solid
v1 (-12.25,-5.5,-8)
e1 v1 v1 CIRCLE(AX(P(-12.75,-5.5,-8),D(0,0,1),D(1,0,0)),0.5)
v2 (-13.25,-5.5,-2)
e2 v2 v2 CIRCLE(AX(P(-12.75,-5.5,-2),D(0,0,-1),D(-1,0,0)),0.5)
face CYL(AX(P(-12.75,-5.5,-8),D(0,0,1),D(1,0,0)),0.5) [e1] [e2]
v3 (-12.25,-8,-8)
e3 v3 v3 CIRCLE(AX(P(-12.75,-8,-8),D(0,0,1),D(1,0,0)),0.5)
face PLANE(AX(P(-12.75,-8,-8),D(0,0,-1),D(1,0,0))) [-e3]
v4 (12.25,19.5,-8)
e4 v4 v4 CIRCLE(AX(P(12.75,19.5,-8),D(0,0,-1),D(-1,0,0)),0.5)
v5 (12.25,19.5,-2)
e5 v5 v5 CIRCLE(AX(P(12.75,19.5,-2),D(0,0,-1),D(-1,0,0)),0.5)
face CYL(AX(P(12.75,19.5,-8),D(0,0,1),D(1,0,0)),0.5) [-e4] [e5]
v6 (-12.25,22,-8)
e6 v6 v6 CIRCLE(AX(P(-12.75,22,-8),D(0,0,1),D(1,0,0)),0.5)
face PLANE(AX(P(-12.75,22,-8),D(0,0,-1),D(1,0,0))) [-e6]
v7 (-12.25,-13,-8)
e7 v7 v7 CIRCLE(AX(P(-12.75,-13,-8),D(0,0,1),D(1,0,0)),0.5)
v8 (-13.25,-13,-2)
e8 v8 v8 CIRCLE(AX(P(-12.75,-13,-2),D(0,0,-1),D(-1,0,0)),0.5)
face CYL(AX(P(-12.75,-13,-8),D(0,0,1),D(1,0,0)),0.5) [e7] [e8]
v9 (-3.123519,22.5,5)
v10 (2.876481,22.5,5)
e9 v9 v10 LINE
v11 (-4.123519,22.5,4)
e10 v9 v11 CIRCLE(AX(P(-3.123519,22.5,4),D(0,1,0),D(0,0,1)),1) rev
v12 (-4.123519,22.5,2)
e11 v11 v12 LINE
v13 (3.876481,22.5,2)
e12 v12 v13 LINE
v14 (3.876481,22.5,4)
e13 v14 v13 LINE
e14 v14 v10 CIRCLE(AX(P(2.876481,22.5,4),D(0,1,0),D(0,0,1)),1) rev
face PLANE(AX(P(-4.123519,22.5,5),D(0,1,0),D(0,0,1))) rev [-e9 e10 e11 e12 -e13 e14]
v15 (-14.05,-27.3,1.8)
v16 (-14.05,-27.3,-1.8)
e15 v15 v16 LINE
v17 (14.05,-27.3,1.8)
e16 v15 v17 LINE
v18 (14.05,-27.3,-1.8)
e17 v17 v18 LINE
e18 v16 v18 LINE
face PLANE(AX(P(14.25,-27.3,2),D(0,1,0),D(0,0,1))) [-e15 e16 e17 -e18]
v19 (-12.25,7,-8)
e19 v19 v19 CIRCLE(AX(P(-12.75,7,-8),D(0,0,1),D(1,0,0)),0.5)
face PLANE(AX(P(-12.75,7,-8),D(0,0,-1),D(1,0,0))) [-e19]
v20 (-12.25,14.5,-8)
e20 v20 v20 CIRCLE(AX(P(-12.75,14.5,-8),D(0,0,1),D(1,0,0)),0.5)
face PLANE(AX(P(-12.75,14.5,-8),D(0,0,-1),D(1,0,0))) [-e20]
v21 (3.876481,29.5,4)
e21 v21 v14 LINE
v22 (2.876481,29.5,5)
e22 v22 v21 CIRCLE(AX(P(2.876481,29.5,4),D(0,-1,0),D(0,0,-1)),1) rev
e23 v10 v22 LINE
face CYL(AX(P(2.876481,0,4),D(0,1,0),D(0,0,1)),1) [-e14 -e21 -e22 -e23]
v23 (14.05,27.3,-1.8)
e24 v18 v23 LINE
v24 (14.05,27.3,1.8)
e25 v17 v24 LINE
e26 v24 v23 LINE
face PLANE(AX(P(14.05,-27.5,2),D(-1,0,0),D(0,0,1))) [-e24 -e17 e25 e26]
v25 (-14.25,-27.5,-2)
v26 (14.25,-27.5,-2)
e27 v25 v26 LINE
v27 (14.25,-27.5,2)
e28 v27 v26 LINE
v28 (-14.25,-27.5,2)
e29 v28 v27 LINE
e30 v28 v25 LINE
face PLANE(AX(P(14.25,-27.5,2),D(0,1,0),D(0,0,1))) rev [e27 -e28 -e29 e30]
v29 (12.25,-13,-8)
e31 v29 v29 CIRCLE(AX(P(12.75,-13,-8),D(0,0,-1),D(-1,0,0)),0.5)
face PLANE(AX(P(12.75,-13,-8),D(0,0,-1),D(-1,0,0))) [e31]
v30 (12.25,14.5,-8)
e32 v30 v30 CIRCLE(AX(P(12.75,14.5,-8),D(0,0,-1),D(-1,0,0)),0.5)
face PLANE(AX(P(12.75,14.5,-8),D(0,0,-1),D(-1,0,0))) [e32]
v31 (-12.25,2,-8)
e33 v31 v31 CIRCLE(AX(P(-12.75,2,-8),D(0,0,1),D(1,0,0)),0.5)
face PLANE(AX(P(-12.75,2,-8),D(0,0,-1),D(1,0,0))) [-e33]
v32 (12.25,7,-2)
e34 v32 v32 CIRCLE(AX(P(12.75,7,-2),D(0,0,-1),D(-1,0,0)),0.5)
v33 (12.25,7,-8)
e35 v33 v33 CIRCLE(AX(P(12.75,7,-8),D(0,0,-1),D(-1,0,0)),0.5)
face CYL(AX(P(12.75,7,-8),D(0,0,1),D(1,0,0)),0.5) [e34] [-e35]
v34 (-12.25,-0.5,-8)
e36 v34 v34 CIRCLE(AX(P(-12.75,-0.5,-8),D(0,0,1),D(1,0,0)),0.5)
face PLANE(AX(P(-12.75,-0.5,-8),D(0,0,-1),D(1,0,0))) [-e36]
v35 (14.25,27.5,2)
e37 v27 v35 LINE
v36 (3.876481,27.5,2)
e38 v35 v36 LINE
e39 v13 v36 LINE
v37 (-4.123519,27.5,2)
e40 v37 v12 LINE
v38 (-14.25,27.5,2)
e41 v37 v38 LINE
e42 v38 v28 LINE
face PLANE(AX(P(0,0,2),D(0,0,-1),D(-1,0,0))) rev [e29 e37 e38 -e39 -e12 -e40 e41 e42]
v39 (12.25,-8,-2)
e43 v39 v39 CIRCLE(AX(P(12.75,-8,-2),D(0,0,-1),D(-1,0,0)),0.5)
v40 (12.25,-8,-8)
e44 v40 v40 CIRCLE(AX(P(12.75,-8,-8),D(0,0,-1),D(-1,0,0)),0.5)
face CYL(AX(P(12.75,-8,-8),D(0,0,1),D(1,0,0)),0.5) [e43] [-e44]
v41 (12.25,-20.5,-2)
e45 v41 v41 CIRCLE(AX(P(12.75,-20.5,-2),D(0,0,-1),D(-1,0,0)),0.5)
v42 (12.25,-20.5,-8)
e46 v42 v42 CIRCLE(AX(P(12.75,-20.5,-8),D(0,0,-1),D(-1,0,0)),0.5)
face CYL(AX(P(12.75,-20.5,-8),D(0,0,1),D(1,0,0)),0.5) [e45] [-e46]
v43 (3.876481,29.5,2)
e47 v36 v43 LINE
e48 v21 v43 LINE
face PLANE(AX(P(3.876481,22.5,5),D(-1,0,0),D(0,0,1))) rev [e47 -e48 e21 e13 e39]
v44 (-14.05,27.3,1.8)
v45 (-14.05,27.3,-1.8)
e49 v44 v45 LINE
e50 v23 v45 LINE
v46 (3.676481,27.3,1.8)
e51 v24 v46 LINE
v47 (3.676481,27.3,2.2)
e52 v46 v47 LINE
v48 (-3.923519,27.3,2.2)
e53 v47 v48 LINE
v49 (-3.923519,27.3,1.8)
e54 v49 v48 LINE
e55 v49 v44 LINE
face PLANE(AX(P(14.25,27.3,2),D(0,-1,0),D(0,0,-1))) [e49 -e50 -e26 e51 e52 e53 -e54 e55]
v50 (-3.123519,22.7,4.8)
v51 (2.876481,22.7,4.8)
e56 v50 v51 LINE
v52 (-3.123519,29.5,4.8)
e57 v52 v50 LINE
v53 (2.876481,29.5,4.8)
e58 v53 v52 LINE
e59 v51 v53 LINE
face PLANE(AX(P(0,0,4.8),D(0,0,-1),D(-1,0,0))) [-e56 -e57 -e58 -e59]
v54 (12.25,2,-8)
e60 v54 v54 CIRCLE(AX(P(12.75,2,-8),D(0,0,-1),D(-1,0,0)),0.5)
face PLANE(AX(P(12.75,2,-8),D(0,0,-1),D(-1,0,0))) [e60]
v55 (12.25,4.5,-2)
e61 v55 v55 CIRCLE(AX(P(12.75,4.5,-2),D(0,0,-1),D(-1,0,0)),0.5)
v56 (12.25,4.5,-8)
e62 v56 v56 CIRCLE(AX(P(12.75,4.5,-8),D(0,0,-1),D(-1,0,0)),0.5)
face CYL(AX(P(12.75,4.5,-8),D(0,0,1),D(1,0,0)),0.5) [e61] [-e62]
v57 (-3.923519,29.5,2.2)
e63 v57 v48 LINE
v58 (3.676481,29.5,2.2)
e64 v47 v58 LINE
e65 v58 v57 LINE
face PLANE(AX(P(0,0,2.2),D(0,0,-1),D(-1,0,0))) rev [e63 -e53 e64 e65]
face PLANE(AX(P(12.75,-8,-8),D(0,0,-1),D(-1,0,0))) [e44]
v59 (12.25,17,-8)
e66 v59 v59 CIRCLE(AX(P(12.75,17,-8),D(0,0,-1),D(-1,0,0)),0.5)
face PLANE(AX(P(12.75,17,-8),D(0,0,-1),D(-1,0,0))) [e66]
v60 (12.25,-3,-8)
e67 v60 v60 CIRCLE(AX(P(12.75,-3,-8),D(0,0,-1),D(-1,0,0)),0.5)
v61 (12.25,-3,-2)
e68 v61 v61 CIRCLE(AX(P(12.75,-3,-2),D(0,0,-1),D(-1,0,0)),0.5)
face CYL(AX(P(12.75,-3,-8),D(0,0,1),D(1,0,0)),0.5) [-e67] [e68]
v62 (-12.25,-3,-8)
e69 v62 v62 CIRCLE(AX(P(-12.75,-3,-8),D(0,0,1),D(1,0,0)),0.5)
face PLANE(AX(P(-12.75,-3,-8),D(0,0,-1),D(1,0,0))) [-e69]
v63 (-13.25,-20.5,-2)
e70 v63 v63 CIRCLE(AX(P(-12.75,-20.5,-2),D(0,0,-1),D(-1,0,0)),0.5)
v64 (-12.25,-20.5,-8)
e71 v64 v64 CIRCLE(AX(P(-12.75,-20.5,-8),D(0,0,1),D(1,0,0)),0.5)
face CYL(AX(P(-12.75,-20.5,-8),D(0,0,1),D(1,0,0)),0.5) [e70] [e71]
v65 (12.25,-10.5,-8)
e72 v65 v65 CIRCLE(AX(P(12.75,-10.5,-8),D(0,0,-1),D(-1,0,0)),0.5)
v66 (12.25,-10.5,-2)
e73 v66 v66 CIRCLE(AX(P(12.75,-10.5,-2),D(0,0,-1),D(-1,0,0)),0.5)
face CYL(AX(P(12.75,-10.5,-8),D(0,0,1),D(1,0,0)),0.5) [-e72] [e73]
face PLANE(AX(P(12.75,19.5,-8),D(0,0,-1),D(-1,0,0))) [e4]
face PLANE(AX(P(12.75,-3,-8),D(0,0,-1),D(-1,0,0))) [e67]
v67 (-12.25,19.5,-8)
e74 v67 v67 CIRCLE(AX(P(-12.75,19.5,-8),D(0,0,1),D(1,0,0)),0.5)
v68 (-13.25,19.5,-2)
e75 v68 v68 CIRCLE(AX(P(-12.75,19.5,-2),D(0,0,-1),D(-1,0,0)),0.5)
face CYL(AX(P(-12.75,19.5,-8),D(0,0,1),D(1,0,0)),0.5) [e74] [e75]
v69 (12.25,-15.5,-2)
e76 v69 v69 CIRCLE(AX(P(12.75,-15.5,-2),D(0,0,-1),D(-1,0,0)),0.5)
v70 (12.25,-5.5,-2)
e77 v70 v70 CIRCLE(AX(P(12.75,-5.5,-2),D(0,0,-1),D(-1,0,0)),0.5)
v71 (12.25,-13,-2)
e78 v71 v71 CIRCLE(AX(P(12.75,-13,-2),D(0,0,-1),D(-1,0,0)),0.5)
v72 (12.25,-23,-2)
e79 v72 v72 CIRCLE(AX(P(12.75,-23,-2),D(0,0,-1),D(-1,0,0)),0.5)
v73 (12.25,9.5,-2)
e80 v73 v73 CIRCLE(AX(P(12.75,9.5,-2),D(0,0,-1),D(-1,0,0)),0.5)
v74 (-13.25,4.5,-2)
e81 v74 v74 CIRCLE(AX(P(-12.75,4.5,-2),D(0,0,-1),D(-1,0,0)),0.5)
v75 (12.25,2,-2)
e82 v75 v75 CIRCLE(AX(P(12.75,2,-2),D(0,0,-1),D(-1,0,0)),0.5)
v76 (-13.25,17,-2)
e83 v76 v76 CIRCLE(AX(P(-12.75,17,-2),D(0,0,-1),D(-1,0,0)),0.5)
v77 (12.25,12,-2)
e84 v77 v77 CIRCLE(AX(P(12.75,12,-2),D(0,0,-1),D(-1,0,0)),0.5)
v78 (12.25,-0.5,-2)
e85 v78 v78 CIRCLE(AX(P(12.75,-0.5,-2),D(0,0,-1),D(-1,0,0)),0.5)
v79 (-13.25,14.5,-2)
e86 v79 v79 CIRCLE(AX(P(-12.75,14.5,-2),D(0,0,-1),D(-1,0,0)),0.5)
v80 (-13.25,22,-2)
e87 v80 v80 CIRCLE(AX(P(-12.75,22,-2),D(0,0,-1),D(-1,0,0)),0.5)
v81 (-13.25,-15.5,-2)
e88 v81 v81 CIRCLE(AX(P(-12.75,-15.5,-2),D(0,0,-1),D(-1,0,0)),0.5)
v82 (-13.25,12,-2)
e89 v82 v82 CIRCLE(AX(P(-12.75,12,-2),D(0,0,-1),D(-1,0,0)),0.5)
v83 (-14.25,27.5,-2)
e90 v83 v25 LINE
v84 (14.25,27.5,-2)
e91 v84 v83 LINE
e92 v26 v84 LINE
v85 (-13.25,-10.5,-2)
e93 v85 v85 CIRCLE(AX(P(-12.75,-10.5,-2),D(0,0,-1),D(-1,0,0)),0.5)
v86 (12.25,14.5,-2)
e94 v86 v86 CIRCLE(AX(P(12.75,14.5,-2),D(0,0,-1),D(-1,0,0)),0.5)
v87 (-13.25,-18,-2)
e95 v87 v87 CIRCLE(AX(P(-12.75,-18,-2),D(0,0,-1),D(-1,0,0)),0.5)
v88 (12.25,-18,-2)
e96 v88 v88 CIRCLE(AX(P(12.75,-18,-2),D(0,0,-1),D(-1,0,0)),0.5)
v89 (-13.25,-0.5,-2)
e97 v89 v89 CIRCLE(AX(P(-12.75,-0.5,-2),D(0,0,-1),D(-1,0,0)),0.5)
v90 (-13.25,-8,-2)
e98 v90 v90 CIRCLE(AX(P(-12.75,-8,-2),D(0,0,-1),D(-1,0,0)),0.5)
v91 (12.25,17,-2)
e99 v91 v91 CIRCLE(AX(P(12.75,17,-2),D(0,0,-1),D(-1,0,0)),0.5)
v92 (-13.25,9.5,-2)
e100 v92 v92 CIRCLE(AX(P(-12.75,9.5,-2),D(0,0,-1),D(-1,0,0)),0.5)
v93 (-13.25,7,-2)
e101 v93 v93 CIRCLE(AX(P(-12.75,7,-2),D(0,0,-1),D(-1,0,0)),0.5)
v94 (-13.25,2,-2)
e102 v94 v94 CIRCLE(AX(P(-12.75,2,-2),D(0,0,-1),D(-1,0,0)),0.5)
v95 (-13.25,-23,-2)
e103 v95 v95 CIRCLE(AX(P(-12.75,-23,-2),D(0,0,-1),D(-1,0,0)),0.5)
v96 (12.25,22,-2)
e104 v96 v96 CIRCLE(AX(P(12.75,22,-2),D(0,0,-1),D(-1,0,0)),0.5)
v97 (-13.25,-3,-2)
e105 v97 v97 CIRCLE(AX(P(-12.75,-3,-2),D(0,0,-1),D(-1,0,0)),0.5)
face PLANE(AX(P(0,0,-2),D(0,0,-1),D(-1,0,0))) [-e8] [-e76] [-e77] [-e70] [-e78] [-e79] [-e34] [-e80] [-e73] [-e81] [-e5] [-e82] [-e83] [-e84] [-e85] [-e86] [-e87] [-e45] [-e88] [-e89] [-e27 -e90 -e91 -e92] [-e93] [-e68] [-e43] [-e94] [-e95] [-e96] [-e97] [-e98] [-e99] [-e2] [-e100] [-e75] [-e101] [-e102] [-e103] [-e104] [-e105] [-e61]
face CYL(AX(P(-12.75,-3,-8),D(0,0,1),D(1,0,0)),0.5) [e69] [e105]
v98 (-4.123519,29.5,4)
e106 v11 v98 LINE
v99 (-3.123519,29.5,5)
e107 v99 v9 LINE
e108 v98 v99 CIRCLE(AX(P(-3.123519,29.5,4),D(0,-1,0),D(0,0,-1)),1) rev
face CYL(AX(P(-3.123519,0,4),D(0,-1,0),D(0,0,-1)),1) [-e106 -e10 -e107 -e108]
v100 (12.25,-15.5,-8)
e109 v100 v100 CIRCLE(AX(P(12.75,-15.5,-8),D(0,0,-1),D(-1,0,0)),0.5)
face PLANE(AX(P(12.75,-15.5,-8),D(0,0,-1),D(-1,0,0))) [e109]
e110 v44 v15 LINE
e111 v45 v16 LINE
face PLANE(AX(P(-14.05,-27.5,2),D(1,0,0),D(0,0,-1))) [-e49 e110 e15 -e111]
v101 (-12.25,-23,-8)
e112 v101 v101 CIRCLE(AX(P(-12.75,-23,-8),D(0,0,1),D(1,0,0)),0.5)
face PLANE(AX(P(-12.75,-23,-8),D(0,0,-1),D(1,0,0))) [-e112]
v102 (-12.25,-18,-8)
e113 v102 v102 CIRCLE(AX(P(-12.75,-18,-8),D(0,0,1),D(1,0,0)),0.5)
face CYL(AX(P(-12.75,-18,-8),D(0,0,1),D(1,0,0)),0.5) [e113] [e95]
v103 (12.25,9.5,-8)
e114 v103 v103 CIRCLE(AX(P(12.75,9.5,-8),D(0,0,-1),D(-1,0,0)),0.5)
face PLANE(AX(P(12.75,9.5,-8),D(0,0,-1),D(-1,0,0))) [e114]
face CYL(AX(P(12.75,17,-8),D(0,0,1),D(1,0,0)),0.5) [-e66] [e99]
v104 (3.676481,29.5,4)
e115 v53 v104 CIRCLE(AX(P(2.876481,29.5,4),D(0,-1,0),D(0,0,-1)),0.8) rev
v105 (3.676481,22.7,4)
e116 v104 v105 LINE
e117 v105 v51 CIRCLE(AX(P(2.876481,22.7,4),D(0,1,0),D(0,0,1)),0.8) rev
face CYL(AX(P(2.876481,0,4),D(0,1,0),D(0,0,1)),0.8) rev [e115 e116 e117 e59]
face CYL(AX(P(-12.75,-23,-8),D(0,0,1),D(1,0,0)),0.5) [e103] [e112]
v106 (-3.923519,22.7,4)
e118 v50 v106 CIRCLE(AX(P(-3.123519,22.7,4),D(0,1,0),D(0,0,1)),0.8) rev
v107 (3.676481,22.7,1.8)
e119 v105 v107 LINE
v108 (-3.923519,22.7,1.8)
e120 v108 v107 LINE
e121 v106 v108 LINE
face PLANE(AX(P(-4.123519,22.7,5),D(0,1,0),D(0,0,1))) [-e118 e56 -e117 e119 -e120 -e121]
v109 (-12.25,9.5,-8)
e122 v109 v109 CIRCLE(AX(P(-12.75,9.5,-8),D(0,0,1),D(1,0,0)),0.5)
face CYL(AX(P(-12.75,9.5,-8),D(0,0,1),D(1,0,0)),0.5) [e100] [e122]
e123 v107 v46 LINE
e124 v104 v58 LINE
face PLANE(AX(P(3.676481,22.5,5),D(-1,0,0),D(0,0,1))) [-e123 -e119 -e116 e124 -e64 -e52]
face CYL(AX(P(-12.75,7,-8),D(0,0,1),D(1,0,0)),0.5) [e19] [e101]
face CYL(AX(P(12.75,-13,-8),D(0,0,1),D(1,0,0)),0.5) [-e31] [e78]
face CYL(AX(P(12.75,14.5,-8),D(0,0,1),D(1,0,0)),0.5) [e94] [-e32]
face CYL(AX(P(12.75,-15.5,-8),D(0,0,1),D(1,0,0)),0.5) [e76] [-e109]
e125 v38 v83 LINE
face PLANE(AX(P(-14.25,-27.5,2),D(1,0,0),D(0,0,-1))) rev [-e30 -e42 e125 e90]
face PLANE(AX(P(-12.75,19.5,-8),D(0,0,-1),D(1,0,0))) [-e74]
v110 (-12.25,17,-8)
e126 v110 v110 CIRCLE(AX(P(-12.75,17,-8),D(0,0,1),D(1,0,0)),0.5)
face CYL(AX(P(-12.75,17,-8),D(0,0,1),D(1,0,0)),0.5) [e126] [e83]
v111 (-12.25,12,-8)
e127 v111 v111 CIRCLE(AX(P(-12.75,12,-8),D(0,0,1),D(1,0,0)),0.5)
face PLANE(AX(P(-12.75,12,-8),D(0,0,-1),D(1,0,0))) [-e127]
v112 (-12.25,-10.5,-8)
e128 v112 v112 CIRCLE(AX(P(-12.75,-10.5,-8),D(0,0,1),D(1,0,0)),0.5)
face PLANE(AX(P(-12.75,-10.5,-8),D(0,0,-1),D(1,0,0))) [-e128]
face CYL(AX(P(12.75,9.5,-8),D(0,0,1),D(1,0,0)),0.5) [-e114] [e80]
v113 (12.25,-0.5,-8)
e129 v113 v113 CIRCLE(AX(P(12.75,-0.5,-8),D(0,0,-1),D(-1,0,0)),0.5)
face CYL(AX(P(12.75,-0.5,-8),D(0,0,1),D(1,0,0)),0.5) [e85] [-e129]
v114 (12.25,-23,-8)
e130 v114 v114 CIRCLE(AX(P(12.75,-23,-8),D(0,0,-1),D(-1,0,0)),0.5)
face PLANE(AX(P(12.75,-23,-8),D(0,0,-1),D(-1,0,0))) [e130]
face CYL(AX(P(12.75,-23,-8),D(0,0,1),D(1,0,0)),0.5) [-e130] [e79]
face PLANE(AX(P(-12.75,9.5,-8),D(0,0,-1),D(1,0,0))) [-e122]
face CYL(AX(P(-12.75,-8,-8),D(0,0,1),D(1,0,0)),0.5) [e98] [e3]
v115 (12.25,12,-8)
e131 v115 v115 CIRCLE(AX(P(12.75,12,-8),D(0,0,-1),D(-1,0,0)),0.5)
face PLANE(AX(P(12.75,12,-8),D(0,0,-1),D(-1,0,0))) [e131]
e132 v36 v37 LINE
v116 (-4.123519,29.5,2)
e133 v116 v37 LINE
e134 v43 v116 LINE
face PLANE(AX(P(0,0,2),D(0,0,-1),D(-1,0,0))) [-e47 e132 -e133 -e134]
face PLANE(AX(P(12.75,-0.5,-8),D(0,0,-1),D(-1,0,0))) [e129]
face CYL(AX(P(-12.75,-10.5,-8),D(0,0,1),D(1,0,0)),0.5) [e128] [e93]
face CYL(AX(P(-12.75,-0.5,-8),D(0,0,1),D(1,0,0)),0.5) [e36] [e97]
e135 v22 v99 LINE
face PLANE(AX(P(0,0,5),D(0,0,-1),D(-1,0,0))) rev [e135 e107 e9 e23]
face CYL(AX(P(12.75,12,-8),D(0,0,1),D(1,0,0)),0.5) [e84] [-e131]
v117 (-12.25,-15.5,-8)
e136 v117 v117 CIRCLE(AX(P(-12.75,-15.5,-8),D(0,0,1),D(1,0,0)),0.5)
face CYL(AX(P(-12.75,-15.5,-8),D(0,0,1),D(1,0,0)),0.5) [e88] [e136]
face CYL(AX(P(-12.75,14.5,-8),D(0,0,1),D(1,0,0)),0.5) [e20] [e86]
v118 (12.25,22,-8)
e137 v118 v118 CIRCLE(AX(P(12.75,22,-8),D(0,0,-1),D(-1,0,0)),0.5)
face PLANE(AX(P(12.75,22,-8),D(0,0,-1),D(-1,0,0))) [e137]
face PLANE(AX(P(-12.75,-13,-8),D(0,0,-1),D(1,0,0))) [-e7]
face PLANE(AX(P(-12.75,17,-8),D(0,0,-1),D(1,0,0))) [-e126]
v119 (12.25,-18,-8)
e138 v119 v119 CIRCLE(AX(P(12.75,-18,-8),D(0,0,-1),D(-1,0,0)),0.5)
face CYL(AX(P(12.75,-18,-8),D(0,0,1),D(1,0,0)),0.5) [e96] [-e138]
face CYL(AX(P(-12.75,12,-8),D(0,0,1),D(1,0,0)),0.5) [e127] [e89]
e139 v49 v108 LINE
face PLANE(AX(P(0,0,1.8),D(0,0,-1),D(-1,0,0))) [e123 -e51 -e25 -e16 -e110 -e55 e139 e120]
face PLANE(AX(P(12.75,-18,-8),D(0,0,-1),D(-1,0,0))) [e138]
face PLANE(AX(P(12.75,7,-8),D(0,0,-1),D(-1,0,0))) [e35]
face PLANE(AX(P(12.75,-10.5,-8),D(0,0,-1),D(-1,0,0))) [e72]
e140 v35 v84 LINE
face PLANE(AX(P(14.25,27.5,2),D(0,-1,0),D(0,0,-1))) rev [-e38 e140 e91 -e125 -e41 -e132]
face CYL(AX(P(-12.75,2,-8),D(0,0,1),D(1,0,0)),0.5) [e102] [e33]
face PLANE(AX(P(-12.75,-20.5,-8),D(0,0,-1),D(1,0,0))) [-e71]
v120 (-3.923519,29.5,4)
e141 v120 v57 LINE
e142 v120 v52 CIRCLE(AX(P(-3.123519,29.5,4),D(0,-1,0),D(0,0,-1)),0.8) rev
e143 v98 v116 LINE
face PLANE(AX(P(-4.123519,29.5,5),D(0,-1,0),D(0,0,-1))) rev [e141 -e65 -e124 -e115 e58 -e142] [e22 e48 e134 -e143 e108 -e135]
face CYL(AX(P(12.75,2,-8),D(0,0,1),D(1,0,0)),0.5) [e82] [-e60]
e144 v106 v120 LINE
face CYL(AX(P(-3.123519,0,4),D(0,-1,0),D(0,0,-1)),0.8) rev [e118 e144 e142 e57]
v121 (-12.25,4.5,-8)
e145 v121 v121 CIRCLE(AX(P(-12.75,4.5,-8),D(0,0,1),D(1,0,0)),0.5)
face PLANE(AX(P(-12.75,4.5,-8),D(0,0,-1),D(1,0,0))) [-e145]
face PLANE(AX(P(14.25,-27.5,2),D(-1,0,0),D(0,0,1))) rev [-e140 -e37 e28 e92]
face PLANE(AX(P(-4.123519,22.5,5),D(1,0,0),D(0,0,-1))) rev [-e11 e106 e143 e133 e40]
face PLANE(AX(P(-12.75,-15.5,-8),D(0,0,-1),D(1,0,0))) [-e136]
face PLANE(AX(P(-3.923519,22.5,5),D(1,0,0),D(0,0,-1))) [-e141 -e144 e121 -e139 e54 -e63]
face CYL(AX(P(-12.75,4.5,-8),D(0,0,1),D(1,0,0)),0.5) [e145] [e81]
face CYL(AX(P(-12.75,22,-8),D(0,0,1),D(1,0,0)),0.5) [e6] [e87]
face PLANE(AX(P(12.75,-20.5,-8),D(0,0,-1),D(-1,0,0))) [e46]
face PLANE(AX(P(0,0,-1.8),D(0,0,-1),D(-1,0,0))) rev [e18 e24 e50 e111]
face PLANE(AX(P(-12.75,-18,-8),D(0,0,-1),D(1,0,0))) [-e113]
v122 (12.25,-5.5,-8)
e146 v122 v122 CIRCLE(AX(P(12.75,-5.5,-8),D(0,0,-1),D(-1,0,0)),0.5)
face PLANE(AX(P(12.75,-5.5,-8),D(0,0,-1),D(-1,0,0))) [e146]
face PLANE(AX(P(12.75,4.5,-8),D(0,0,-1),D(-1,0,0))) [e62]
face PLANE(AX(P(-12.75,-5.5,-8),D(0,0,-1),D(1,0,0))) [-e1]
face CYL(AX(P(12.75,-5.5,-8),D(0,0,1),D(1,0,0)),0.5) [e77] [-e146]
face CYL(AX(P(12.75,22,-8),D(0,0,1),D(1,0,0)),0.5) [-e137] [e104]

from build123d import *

# Parameters (mm, degrees)
SKETCH1_W           = 55
SKETCH1_H           = 28.5
BOSS_EXTRUDE1_DEPTH = 2
SKETCH2_W           = 8
SKETCH2_H           = 7
BOSS_EXTRUDE2_DEPTH = 3
FILLET2_R           = 1
SHELL2_START        = -27.3
SHELL2_OUTLINE_W    = 28.1
SHELL2_OUTLINE_H    = 3.6
SHELL2_DEPTH        = 54.6
SHELL2_START_2      = 22.7
SHELL2_2_DEPTH      = 6.8
SHELL2_3_OUTLINE_W  = 7.6
SHELL2_3_OUTLINE_H  = 0.4
SHELL2_3_DEPTH      = 4.6
SKETCH3_R           = 0.5
BOSS_EXTRUDE3_DEPTH = 6


# Read off the part's stored shape, not the designer's step: Shell2
with BuildPart() as part:
    # Sketch1 → Boss-Extrude1 (new, symmetric)
    with BuildSketch(Plane(origin=(0, 0, 0), x_dir=(0, 1, 0), z_dir=(0, 0, 1))):
        Rectangle(SKETCH1_W, SKETCH1_H)
    extrude(amount=BOSS_EXTRUDE1_DEPTH, both=True)

    # Sketch2 → Boss-Extrude2 (add)
    with BuildSketch(Plane.XY.offset(2)):
        with Locations((-0.123519145, 26)):
            Rectangle(SKETCH2_W, SKETCH2_H)
    extrude(amount=BOSS_EXTRUDE2_DEPTH)

    # Fillet2
    fillet2_edges = [part.edges().sort_by_distance(p)[0] for p in [
        (3.876480855, 26, 5),
        (-4.123519145, 26, 5),
    ]]
    fillet(fillet2_edges, radius=FILLET2_R)

    # Shell2 outline → Shell2 (cut)
    with BuildSketch(Plane(origin=(0, 0, 0), x_dir=(1, 0, 0), z_dir=(0, 1, 0)).offset(SHELL2_START)):
        Rectangle(SHELL2_OUTLINE_W, SHELL2_OUTLINE_H)
    extrude(amount=SHELL2_DEPTH, mode=Mode.SUBTRACT)

    # Shell2 2 outline → Shell2 2 (cut)
    with BuildSketch(Plane(origin=(0, 0, 0), x_dir=(1, 0, 0), z_dir=(0, 1, 0)).offset(SHELL2_START_2)):
        with BuildLine():
            Line((3.676480855, -4), (3.676480855, -2.2))
            Line((3.676480855, -2.2), (-3.923519145, -2.2))
            Line((-3.923519145, -2.2), (-3.923519145, -4))
            ThreePointArc((-3.923519145, -4), (-3.68920457, -4.565685425), (-3.123519145, -4.8))
            Line((-3.123519145, -4.8), (2.876480855, -4.8))
            ThreePointArc((2.876480855, -4.8), (3.44216628, -4.565685425), (3.676480855, -4))
        make_face()
    extrude(amount=SHELL2_2_DEPTH, mode=Mode.SUBTRACT)

    # Shell2 3 outline → Shell2 3 (cut)
    with BuildSketch(Plane(origin=(0, 0, 0), x_dir=(1, 0, 0), z_dir=(0, 1, 0)).offset(SHELL2_START_2)):
        with Locations((-0.123519145, -2)):
            Rectangle(SHELL2_3_OUTLINE_W, SHELL2_3_OUTLINE_H)
    extrude(amount=SHELL2_3_DEPTH, mode=Mode.SUBTRACT)

    # Sketch3 → Boss-Extrude3 (add)
    with BuildSketch(Plane(origin=(0, 0, -2), x_dir=(1, 0, 0), z_dir=(0, 0, -1))):
        with Locations(Location((12.75, 23, 0), (0, 0, 180))):
            Circle(SKETCH3_R)
        with Locations(Location((12.75, 20.5, 0), (0, 0, 180))):
            Circle(SKETCH3_R)
        with Locations(Location((12.75, 18, 0), (0, 0, 180))):
            Circle(SKETCH3_R)
        with Locations(Location((12.75, 15.5, 0), (0, 0, 180))):
            Circle(SKETCH3_R)
        with Locations(Location((12.75, 13, 0), (0, 0, 180))):
            Circle(SKETCH3_R)
        with Locations(Location((12.75, 10.5, 0), (0, 0, 180))):
            Circle(SKETCH3_R)
        with Locations(Location((12.75, 8, 0), (0, 0, 180))):
            Circle(SKETCH3_R)
        with Locations(Location((12.75, 5.5, 0), (0, 0, 180))):
            Circle(SKETCH3_R)
        with Locations(Location((12.75, 3, 0), (0, 0, 180))):
            Circle(SKETCH3_R)
        with Locations(Location((12.75, 0.5, 0), (0, 0, 180))):
            Circle(SKETCH3_R)
        with Locations(Location((12.75, -2, 0), (0, 0, 180))):
            Circle(SKETCH3_R)
        with Locations(Location((12.75, -4.5, 0), (0, 0, 180))):
            Circle(SKETCH3_R)
        with Locations(Location((12.75, -7, 0), (0, 0, 180))):
            Circle(SKETCH3_R)
        with Locations(Location((12.75, -9.5, 0), (0, 0, 180))):
            Circle(SKETCH3_R)
        with Locations(Location((12.75, -12, 0), (0, 0, 180))):
            Circle(SKETCH3_R)
        with Locations(Location((12.75, -14.5, 0), (0, 0, 180))):
            Circle(SKETCH3_R)
        with Locations(Location((12.75, -17, 0), (0, 0, 180))):
            Circle(SKETCH3_R)
        with Locations(Location((12.75, -19.5, 0), (0, 0, 180))):
            Circle(SKETCH3_R)
        with Locations(Location((12.75, -22, 0), (0, 0, 180))):
            Circle(SKETCH3_R)
    boss_extrude3 = extrude(amount=BOSS_EXTRUDE3_DEPTH)

    # Mirror1: Boss-Extrude3 across plane
    add(boss_extrude3.mirror(Plane(origin=(0, 0, 0), x_dir=(0, 0, 1), z_dir=(1, 0, 0))))


solid = part.part
